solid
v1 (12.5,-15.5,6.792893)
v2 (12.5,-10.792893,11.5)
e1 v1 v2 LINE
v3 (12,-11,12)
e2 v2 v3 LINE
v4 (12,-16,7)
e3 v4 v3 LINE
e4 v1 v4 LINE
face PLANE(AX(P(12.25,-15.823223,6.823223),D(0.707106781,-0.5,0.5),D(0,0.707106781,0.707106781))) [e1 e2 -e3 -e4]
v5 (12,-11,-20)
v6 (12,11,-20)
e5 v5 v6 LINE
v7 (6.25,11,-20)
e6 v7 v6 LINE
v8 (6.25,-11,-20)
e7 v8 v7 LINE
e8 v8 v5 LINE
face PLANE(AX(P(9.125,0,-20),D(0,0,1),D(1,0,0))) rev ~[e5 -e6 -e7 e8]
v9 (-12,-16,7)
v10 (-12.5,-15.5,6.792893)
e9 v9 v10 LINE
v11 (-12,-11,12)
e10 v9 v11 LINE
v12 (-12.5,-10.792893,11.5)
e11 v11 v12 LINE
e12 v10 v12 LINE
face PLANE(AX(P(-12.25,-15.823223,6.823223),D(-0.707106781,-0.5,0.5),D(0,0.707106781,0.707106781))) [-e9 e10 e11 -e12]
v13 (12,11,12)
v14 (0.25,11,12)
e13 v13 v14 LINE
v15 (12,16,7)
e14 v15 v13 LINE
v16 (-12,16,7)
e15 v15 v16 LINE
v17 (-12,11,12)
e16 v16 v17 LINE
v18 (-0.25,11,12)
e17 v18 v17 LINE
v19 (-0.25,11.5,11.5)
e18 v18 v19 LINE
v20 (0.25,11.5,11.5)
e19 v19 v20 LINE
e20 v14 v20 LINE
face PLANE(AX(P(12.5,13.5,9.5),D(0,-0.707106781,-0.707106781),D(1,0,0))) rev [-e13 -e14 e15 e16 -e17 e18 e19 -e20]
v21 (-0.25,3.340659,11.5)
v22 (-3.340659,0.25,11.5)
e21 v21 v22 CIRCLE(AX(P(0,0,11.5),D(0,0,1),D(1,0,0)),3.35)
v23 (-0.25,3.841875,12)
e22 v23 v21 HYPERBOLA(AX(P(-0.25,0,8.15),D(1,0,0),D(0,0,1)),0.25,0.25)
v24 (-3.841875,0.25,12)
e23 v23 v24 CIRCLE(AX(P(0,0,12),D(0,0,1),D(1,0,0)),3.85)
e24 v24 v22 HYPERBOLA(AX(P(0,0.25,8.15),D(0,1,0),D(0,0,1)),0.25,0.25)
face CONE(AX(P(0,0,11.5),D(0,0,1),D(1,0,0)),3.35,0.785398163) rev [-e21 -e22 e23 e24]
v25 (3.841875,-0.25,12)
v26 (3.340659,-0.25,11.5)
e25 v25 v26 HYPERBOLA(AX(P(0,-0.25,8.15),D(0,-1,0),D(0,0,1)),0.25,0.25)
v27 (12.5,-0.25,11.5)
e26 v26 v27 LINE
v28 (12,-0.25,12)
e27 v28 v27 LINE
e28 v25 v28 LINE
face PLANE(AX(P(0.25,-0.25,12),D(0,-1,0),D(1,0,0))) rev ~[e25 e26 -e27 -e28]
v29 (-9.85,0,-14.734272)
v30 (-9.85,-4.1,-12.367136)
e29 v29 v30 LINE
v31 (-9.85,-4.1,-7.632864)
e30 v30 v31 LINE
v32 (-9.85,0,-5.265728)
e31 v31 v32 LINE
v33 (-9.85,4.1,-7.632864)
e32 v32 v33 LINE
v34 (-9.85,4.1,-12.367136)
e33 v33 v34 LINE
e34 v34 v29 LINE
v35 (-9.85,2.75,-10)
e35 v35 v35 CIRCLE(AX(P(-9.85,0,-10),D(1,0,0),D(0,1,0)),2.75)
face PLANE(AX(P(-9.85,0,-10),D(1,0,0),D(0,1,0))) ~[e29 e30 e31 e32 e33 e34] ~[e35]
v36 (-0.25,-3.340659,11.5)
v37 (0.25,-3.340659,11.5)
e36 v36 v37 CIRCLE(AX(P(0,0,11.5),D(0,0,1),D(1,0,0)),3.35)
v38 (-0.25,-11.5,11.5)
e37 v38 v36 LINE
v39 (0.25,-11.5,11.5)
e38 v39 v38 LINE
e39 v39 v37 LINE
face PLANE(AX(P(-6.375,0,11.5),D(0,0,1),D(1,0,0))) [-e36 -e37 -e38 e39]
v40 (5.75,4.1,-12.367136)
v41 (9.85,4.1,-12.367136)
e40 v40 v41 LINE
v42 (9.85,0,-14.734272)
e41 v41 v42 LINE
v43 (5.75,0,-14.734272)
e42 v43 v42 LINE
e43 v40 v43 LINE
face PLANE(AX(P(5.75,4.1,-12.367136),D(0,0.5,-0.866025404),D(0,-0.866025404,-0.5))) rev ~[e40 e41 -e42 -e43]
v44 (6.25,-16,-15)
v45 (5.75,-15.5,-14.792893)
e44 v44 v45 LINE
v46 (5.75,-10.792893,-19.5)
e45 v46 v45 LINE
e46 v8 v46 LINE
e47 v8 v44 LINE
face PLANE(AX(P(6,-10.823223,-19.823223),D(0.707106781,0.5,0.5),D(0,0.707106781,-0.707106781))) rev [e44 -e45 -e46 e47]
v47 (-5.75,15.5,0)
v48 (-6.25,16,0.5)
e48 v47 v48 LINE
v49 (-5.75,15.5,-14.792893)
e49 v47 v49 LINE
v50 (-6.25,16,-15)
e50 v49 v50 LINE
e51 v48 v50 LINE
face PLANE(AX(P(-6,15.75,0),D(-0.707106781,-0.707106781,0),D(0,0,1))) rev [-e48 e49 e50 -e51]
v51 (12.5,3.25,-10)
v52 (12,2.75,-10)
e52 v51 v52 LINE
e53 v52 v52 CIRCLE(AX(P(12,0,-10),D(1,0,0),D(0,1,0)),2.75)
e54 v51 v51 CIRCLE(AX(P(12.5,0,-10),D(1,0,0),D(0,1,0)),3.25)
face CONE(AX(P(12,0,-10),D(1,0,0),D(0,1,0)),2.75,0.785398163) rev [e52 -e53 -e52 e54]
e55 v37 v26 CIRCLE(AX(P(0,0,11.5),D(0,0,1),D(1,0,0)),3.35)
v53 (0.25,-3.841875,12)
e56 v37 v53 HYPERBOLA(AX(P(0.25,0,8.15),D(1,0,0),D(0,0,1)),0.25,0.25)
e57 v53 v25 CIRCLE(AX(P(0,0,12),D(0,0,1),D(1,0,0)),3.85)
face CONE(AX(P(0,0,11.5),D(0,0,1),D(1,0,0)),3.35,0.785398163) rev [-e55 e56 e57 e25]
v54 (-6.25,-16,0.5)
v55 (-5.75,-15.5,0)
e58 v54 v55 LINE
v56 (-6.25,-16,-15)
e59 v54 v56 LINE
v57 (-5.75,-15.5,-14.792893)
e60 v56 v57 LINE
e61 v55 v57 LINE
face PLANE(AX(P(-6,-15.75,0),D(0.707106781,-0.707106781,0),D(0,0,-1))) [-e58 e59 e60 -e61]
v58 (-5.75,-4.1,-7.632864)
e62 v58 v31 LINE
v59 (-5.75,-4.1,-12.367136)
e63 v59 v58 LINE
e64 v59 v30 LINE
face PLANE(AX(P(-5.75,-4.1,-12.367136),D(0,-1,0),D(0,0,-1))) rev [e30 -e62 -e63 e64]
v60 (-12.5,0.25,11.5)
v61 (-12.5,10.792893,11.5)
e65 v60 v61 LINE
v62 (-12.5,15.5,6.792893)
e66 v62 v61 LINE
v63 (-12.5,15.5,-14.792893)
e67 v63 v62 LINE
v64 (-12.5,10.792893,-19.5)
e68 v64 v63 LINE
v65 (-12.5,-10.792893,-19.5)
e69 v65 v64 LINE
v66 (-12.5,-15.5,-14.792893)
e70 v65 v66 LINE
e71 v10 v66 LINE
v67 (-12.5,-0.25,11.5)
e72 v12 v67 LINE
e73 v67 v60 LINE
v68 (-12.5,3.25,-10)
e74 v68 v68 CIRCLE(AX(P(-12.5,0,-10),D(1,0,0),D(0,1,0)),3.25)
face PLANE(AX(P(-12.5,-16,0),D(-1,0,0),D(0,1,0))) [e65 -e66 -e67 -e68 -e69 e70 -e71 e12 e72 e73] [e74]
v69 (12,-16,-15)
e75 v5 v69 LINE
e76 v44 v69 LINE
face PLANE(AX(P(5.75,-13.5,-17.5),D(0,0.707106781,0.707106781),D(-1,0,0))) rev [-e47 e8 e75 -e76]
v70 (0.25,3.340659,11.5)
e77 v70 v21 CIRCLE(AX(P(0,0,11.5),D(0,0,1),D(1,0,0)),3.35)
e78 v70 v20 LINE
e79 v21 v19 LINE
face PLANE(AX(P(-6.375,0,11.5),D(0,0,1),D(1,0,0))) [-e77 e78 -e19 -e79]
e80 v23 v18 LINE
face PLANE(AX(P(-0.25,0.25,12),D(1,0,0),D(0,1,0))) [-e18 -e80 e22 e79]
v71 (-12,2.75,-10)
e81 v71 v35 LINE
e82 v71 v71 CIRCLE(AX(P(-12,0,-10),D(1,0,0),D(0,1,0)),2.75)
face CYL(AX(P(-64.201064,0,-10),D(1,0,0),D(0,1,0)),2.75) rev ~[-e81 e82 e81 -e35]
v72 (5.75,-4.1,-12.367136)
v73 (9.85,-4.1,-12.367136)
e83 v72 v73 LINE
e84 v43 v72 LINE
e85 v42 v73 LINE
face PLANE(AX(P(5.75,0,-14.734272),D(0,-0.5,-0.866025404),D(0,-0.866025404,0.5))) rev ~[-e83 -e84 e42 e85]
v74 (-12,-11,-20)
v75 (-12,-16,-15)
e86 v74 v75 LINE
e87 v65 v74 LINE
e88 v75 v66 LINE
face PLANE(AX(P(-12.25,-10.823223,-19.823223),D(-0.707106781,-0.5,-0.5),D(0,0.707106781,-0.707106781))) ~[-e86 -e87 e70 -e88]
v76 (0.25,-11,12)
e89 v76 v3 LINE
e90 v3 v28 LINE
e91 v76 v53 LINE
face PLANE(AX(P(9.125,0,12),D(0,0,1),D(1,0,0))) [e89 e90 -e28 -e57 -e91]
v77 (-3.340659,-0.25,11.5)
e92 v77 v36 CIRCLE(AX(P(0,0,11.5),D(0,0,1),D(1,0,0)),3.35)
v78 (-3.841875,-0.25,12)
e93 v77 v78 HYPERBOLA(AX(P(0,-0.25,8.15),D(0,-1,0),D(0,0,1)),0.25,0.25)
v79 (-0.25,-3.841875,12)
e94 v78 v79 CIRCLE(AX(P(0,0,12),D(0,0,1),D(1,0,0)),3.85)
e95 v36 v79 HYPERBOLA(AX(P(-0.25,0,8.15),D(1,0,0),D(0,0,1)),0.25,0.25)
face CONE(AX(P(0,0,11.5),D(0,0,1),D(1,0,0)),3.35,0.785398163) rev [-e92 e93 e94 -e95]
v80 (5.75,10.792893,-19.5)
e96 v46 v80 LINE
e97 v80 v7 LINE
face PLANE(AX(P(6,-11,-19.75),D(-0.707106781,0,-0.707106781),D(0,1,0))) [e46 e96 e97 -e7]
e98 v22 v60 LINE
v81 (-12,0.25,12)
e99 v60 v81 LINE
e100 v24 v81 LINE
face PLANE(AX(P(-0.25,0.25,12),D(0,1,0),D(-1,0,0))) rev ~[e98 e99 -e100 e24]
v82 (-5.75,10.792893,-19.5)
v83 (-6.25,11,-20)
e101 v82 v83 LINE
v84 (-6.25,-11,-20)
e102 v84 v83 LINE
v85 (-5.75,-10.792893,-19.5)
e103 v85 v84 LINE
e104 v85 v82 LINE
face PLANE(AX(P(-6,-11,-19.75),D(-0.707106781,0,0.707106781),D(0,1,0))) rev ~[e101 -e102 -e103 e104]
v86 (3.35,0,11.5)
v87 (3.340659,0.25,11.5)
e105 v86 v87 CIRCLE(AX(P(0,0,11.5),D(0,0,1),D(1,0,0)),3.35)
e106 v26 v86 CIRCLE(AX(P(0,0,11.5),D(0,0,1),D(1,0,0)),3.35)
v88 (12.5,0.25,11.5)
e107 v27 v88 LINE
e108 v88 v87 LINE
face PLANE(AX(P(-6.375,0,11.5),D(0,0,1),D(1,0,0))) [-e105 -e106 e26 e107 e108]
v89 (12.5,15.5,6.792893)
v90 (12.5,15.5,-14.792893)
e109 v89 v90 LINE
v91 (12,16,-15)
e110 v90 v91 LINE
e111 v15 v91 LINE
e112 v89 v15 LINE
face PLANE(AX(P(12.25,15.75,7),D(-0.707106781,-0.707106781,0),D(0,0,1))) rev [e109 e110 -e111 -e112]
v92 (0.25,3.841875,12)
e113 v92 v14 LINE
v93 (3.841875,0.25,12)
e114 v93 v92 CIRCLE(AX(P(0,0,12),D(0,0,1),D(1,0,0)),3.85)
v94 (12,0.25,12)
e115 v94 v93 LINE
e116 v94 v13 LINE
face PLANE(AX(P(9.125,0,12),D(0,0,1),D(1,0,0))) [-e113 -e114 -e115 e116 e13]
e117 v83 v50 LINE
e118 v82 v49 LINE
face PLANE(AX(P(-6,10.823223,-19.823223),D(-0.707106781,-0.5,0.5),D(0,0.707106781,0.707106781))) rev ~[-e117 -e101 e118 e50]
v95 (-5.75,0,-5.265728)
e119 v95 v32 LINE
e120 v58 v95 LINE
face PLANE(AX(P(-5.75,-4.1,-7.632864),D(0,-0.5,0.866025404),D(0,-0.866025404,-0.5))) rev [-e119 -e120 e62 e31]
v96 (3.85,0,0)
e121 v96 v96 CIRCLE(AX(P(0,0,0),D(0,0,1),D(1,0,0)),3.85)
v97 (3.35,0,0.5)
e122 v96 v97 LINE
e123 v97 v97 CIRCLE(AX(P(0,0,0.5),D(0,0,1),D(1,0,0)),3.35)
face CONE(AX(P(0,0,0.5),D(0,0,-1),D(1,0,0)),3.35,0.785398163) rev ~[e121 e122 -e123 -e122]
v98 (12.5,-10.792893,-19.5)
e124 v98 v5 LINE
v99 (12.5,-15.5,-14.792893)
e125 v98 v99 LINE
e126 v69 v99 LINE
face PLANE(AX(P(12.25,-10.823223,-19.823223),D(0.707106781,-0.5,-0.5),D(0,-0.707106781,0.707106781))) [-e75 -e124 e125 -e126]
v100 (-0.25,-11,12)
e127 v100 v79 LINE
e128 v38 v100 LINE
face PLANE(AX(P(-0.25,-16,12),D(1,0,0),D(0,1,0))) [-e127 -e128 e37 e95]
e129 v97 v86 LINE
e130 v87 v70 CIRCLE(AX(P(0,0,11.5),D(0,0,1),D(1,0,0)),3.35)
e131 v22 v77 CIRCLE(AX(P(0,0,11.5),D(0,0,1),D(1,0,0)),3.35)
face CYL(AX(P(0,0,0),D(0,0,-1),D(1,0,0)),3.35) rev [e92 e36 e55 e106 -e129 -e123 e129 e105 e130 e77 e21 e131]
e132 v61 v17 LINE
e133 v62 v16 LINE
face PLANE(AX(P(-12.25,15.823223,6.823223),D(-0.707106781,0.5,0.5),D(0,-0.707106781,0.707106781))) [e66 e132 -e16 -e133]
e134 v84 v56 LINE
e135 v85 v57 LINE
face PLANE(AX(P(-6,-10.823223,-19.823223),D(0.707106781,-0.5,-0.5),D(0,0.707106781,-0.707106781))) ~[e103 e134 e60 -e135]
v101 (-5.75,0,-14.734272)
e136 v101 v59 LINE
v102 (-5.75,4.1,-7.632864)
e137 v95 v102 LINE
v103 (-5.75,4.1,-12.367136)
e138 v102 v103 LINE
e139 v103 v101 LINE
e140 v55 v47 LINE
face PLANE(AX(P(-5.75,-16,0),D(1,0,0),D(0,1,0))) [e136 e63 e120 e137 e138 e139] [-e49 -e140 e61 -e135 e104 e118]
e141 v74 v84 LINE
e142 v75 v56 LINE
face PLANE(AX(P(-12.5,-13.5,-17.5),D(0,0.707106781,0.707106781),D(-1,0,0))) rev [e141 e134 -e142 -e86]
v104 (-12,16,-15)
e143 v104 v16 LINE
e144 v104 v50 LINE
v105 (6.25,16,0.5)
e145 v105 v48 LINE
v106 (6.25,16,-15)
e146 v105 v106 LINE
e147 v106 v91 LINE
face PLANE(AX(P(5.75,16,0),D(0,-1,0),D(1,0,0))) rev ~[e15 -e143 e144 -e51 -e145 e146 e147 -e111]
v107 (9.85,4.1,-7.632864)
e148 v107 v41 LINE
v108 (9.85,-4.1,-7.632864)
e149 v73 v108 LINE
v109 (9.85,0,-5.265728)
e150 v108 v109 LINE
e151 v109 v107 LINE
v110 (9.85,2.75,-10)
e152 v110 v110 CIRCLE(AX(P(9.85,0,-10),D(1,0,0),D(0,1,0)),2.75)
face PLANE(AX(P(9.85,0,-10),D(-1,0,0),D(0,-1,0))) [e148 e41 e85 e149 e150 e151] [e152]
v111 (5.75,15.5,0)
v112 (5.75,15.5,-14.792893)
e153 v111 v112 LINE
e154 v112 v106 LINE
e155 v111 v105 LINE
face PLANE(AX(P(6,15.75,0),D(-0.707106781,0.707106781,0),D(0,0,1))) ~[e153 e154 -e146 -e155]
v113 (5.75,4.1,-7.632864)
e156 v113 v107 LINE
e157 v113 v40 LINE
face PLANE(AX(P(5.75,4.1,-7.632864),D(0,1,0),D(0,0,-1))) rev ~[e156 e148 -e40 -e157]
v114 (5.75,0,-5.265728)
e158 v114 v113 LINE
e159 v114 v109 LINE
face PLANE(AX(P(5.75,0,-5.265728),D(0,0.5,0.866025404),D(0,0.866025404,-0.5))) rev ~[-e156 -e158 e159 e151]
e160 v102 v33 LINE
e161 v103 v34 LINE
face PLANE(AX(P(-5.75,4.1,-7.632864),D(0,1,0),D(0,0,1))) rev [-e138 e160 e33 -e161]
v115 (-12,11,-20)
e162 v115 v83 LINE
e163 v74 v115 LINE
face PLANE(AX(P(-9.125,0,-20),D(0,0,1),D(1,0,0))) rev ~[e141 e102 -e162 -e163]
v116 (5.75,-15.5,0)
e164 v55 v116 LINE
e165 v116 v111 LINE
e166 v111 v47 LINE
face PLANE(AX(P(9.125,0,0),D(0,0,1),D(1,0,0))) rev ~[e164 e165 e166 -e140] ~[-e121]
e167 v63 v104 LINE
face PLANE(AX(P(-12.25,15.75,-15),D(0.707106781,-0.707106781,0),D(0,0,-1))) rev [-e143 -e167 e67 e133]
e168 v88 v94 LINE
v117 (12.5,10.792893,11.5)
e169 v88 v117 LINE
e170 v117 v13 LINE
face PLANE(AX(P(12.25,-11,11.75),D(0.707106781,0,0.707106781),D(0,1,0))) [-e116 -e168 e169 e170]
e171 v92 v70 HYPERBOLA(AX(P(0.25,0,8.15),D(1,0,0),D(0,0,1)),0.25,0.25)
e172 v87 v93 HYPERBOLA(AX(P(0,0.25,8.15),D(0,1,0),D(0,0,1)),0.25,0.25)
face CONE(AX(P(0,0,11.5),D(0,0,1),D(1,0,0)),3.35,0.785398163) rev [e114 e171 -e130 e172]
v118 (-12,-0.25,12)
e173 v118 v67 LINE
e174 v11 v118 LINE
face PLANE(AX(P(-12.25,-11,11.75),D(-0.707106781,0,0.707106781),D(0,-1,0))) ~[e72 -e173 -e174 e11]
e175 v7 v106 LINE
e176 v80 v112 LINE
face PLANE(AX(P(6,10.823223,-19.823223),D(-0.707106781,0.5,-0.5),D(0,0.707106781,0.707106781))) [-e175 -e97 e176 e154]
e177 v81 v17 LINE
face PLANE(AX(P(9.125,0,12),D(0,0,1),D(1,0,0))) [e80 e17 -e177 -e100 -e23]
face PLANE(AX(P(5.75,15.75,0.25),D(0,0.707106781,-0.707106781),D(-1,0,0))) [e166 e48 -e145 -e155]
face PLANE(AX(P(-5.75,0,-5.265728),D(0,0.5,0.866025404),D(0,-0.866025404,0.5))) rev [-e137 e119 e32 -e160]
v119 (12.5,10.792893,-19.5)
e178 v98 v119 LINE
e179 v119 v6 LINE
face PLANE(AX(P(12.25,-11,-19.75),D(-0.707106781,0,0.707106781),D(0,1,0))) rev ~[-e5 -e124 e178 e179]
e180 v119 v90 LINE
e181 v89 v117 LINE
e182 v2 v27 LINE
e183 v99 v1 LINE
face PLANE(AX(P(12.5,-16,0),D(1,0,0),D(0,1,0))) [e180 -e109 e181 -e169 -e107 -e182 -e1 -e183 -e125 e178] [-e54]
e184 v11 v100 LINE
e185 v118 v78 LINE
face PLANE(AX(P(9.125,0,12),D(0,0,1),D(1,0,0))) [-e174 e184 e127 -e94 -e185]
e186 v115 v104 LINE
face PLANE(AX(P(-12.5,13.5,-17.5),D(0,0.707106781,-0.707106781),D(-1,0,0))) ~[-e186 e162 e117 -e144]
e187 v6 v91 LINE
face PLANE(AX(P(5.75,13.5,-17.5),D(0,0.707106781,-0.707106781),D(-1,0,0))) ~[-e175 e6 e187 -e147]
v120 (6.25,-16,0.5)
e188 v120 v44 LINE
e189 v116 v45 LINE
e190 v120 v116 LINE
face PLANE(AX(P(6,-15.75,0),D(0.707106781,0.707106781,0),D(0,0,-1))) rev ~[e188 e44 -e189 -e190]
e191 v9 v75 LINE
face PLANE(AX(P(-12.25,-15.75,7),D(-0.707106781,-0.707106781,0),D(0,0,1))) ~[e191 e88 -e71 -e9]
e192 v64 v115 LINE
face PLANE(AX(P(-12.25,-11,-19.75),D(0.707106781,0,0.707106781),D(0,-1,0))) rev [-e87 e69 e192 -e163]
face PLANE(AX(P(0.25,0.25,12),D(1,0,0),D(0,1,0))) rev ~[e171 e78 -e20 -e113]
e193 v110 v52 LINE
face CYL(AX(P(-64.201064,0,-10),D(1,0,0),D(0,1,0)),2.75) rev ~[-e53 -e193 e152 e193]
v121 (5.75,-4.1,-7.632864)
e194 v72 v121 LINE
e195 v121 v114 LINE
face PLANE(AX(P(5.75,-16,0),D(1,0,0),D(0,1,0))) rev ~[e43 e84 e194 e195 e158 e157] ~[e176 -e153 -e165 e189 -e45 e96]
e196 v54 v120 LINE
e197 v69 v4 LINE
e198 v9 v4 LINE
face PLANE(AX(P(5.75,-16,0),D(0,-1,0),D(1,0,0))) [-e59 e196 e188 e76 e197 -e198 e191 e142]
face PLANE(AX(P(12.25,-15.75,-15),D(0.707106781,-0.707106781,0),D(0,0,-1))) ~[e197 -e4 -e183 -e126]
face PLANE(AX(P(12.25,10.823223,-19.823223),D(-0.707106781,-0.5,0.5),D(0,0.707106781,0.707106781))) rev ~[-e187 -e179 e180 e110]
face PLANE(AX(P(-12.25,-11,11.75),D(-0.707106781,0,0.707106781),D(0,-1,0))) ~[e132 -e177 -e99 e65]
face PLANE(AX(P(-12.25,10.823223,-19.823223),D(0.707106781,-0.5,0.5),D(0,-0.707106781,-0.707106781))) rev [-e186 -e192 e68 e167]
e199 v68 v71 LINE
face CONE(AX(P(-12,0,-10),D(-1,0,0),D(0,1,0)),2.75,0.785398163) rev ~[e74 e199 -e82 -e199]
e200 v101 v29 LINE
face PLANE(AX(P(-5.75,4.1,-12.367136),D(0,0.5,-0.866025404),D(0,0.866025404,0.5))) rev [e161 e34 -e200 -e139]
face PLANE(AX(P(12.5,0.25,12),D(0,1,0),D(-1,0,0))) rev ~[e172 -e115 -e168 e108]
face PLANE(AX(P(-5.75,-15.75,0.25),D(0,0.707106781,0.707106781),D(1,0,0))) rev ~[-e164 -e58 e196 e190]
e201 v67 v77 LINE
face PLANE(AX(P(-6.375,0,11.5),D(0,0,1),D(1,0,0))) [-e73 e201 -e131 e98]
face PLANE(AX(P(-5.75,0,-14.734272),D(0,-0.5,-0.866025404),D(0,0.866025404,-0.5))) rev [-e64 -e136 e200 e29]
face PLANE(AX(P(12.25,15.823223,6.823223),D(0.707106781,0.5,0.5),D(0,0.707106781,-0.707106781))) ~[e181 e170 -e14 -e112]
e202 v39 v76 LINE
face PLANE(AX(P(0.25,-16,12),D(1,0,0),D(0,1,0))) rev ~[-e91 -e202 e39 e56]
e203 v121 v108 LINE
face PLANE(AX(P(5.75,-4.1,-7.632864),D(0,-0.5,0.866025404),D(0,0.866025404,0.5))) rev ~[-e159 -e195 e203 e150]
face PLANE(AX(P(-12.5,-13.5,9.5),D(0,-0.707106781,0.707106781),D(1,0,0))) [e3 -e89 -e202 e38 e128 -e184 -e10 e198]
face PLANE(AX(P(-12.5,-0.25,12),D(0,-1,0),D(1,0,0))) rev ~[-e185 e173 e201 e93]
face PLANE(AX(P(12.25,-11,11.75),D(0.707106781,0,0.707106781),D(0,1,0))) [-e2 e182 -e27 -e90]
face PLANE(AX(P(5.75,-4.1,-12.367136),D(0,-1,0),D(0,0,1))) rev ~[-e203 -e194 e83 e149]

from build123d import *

# Parameters (mm, degrees)
F0_W      = 6.75
F0_H      = 32
F0_W_2    = 11.5
F0_R      = 3.35
F1_DEPTH  = 12
F2_DEPTH  = 20
F3_SIZE   = 5
F4_SIZE   = 5
F6_D      = 5.5
F8_DEPTH  = 4.1
F10_SIZE  = 0.5
F9_W      = 12.25
F9_H      = 0.5
F9_W_2    = 0.5
F9_H_2    = 15.75
F11_DEPTH = 0.5


# Not quite as in the source:
# - a pattern or mirror of a feature is missing from the dataset's text; its kind, count and spacing are read off the source's solid


with BuildPart() as f1:
    # F0 (on Top) → F1 (new body)
    with BuildSketch(Plane.XY):
        with Locations((9.125, 0)):
            Rectangle(F0_W, F0_H)
        Rectangle(F0_W_2, F0_H)
        Circle(F0_R, mode=Mode.SUBTRACT)
        with Locations((-9.125, 0)):
            Rectangle(F0_W, F0_H)
    extrude(amount=F1_DEPTH)

    # F0 (on Top) → F2 (join)
    with BuildSketch(Plane.XY):
        with Locations((9.125, 0)):
            Rectangle(F0_W, F0_H)
        with Locations((-9.125, 0)):
            Rectangle(F0_W, F0_H)
    extrude(amount=-F2_DEPTH)

    # F3
    f3_edges = [f1.edges().sort_by_distance(p)[0] for p in [
        (-9.125, -16, -20),
        (9.125, -16, -20),
        (9.125, 16, -20),
        (-9.125, 16, -20),
    ]]
    chamfer(f3_edges, length=F3_SIZE)

    # F4
    f4_edges = [f1.edges().sort_by_distance(p)[0] for p in [
        (0, -16, 12),
        (0, 16, 12),
    ]]
    chamfer(f4_edges, length=F4_SIZE)

    # F6 (through all)
    with Locations(Plane(origin=(-12.5, 0, 0), x_dir=(0, -1, 0), z_dir=(-1, 0, 0))):
        with Locations((0, -10)):
            Hole(F6_D / 2)

    # F7 (on face) → F8 (cut)
    with BuildSketch(Plane(origin=(5.75, 0, 0), x_dir=(0, -1, 0), z_dir=(-1, 0, 0))):
        Polygon((4.1, -12.3671361037), (4.1, -7.6328638963), (0, -5.2657277926), (-4.1, -7.6328638963), (-4.1, -12.3671361037), (0, -14.7342722074), align=None)
    f8 = extrude(amount=-F8_DEPTH, mode=Mode.SUBTRACT)

    # F8_copies: F8 across plane
    add(f8.mirror(Plane(origin=(0, 0, 0), x_dir=(0, 0, -1), z_dir=(-1, 0, 0))), mode=Mode.SUBTRACT)

    # F10
    f10_edges = [f1.edges().sort_by_distance(p)[0] for p in [
        (12.5, 0, 12),
        (12.5, -13.5, 9.5),
        (12.5, -16, -4),
        (12.5, -13.5, -17.5),
        (12.5, 0, -20),
        (12.5, 13.5, -17.5),
        (12.5, 16, -4),
        (12.5, 13.5, 9.5),
        (-12.5, -16, -4),
        (-12.5, -13.5, 9.5),
        (-12.5, -13.5, -17.5),
        (-12.5, 0, 12),
        (-12.5, 0, -20),
        (-12.5, 13.5, 9.5),
        (-12.5, 13.5, -17.5),
        (-12.5, 16, -4),
        (-12.5, 2.75, -10),
        (0, 16, 0),
        (0, -16, 0),
        (5.75, -16, -7.5),
        (5.75, -13.5, -17.5),
        (5.75, 0, -20),
        (5.75, 13.5, -17.5),
        (5.75, 16, -7.5),
        (-5.75, 16, -7.5),
        (-5.75, 13.5, -17.5),
        (-5.75, 0, -20),
        (-5.75, -13.5, -17.5),
        (-5.75, -16, -7.5),
        (-3.35, 0, 12),
        (-3.35, 0, 0),
        (12.5, 2.75, -10),
    ]]
    chamfer(f10_edges, length=F10_SIZE)

    # F9 (on face) → F11 (cut)
    with BuildSketch(Plane.XY.offset(12)):
        with Locations((-6.375, 0)):
            Rectangle(F9_W, F9_H)
        Rectangle(F9_W_2, F9_H)
        with Locations((0, -8.125)):
            Rectangle(F9_W_2, F9_H_2)
        with Locations((6.375, 0)):
            Rectangle(F9_W, F9_H)
        with Locations((0, 8.125)):
            Rectangle(F9_W_2, F9_H_2)
    extrude(amount=-F11_DEPTH, mode=Mode.SUBTRACT)


solid = f1.part
